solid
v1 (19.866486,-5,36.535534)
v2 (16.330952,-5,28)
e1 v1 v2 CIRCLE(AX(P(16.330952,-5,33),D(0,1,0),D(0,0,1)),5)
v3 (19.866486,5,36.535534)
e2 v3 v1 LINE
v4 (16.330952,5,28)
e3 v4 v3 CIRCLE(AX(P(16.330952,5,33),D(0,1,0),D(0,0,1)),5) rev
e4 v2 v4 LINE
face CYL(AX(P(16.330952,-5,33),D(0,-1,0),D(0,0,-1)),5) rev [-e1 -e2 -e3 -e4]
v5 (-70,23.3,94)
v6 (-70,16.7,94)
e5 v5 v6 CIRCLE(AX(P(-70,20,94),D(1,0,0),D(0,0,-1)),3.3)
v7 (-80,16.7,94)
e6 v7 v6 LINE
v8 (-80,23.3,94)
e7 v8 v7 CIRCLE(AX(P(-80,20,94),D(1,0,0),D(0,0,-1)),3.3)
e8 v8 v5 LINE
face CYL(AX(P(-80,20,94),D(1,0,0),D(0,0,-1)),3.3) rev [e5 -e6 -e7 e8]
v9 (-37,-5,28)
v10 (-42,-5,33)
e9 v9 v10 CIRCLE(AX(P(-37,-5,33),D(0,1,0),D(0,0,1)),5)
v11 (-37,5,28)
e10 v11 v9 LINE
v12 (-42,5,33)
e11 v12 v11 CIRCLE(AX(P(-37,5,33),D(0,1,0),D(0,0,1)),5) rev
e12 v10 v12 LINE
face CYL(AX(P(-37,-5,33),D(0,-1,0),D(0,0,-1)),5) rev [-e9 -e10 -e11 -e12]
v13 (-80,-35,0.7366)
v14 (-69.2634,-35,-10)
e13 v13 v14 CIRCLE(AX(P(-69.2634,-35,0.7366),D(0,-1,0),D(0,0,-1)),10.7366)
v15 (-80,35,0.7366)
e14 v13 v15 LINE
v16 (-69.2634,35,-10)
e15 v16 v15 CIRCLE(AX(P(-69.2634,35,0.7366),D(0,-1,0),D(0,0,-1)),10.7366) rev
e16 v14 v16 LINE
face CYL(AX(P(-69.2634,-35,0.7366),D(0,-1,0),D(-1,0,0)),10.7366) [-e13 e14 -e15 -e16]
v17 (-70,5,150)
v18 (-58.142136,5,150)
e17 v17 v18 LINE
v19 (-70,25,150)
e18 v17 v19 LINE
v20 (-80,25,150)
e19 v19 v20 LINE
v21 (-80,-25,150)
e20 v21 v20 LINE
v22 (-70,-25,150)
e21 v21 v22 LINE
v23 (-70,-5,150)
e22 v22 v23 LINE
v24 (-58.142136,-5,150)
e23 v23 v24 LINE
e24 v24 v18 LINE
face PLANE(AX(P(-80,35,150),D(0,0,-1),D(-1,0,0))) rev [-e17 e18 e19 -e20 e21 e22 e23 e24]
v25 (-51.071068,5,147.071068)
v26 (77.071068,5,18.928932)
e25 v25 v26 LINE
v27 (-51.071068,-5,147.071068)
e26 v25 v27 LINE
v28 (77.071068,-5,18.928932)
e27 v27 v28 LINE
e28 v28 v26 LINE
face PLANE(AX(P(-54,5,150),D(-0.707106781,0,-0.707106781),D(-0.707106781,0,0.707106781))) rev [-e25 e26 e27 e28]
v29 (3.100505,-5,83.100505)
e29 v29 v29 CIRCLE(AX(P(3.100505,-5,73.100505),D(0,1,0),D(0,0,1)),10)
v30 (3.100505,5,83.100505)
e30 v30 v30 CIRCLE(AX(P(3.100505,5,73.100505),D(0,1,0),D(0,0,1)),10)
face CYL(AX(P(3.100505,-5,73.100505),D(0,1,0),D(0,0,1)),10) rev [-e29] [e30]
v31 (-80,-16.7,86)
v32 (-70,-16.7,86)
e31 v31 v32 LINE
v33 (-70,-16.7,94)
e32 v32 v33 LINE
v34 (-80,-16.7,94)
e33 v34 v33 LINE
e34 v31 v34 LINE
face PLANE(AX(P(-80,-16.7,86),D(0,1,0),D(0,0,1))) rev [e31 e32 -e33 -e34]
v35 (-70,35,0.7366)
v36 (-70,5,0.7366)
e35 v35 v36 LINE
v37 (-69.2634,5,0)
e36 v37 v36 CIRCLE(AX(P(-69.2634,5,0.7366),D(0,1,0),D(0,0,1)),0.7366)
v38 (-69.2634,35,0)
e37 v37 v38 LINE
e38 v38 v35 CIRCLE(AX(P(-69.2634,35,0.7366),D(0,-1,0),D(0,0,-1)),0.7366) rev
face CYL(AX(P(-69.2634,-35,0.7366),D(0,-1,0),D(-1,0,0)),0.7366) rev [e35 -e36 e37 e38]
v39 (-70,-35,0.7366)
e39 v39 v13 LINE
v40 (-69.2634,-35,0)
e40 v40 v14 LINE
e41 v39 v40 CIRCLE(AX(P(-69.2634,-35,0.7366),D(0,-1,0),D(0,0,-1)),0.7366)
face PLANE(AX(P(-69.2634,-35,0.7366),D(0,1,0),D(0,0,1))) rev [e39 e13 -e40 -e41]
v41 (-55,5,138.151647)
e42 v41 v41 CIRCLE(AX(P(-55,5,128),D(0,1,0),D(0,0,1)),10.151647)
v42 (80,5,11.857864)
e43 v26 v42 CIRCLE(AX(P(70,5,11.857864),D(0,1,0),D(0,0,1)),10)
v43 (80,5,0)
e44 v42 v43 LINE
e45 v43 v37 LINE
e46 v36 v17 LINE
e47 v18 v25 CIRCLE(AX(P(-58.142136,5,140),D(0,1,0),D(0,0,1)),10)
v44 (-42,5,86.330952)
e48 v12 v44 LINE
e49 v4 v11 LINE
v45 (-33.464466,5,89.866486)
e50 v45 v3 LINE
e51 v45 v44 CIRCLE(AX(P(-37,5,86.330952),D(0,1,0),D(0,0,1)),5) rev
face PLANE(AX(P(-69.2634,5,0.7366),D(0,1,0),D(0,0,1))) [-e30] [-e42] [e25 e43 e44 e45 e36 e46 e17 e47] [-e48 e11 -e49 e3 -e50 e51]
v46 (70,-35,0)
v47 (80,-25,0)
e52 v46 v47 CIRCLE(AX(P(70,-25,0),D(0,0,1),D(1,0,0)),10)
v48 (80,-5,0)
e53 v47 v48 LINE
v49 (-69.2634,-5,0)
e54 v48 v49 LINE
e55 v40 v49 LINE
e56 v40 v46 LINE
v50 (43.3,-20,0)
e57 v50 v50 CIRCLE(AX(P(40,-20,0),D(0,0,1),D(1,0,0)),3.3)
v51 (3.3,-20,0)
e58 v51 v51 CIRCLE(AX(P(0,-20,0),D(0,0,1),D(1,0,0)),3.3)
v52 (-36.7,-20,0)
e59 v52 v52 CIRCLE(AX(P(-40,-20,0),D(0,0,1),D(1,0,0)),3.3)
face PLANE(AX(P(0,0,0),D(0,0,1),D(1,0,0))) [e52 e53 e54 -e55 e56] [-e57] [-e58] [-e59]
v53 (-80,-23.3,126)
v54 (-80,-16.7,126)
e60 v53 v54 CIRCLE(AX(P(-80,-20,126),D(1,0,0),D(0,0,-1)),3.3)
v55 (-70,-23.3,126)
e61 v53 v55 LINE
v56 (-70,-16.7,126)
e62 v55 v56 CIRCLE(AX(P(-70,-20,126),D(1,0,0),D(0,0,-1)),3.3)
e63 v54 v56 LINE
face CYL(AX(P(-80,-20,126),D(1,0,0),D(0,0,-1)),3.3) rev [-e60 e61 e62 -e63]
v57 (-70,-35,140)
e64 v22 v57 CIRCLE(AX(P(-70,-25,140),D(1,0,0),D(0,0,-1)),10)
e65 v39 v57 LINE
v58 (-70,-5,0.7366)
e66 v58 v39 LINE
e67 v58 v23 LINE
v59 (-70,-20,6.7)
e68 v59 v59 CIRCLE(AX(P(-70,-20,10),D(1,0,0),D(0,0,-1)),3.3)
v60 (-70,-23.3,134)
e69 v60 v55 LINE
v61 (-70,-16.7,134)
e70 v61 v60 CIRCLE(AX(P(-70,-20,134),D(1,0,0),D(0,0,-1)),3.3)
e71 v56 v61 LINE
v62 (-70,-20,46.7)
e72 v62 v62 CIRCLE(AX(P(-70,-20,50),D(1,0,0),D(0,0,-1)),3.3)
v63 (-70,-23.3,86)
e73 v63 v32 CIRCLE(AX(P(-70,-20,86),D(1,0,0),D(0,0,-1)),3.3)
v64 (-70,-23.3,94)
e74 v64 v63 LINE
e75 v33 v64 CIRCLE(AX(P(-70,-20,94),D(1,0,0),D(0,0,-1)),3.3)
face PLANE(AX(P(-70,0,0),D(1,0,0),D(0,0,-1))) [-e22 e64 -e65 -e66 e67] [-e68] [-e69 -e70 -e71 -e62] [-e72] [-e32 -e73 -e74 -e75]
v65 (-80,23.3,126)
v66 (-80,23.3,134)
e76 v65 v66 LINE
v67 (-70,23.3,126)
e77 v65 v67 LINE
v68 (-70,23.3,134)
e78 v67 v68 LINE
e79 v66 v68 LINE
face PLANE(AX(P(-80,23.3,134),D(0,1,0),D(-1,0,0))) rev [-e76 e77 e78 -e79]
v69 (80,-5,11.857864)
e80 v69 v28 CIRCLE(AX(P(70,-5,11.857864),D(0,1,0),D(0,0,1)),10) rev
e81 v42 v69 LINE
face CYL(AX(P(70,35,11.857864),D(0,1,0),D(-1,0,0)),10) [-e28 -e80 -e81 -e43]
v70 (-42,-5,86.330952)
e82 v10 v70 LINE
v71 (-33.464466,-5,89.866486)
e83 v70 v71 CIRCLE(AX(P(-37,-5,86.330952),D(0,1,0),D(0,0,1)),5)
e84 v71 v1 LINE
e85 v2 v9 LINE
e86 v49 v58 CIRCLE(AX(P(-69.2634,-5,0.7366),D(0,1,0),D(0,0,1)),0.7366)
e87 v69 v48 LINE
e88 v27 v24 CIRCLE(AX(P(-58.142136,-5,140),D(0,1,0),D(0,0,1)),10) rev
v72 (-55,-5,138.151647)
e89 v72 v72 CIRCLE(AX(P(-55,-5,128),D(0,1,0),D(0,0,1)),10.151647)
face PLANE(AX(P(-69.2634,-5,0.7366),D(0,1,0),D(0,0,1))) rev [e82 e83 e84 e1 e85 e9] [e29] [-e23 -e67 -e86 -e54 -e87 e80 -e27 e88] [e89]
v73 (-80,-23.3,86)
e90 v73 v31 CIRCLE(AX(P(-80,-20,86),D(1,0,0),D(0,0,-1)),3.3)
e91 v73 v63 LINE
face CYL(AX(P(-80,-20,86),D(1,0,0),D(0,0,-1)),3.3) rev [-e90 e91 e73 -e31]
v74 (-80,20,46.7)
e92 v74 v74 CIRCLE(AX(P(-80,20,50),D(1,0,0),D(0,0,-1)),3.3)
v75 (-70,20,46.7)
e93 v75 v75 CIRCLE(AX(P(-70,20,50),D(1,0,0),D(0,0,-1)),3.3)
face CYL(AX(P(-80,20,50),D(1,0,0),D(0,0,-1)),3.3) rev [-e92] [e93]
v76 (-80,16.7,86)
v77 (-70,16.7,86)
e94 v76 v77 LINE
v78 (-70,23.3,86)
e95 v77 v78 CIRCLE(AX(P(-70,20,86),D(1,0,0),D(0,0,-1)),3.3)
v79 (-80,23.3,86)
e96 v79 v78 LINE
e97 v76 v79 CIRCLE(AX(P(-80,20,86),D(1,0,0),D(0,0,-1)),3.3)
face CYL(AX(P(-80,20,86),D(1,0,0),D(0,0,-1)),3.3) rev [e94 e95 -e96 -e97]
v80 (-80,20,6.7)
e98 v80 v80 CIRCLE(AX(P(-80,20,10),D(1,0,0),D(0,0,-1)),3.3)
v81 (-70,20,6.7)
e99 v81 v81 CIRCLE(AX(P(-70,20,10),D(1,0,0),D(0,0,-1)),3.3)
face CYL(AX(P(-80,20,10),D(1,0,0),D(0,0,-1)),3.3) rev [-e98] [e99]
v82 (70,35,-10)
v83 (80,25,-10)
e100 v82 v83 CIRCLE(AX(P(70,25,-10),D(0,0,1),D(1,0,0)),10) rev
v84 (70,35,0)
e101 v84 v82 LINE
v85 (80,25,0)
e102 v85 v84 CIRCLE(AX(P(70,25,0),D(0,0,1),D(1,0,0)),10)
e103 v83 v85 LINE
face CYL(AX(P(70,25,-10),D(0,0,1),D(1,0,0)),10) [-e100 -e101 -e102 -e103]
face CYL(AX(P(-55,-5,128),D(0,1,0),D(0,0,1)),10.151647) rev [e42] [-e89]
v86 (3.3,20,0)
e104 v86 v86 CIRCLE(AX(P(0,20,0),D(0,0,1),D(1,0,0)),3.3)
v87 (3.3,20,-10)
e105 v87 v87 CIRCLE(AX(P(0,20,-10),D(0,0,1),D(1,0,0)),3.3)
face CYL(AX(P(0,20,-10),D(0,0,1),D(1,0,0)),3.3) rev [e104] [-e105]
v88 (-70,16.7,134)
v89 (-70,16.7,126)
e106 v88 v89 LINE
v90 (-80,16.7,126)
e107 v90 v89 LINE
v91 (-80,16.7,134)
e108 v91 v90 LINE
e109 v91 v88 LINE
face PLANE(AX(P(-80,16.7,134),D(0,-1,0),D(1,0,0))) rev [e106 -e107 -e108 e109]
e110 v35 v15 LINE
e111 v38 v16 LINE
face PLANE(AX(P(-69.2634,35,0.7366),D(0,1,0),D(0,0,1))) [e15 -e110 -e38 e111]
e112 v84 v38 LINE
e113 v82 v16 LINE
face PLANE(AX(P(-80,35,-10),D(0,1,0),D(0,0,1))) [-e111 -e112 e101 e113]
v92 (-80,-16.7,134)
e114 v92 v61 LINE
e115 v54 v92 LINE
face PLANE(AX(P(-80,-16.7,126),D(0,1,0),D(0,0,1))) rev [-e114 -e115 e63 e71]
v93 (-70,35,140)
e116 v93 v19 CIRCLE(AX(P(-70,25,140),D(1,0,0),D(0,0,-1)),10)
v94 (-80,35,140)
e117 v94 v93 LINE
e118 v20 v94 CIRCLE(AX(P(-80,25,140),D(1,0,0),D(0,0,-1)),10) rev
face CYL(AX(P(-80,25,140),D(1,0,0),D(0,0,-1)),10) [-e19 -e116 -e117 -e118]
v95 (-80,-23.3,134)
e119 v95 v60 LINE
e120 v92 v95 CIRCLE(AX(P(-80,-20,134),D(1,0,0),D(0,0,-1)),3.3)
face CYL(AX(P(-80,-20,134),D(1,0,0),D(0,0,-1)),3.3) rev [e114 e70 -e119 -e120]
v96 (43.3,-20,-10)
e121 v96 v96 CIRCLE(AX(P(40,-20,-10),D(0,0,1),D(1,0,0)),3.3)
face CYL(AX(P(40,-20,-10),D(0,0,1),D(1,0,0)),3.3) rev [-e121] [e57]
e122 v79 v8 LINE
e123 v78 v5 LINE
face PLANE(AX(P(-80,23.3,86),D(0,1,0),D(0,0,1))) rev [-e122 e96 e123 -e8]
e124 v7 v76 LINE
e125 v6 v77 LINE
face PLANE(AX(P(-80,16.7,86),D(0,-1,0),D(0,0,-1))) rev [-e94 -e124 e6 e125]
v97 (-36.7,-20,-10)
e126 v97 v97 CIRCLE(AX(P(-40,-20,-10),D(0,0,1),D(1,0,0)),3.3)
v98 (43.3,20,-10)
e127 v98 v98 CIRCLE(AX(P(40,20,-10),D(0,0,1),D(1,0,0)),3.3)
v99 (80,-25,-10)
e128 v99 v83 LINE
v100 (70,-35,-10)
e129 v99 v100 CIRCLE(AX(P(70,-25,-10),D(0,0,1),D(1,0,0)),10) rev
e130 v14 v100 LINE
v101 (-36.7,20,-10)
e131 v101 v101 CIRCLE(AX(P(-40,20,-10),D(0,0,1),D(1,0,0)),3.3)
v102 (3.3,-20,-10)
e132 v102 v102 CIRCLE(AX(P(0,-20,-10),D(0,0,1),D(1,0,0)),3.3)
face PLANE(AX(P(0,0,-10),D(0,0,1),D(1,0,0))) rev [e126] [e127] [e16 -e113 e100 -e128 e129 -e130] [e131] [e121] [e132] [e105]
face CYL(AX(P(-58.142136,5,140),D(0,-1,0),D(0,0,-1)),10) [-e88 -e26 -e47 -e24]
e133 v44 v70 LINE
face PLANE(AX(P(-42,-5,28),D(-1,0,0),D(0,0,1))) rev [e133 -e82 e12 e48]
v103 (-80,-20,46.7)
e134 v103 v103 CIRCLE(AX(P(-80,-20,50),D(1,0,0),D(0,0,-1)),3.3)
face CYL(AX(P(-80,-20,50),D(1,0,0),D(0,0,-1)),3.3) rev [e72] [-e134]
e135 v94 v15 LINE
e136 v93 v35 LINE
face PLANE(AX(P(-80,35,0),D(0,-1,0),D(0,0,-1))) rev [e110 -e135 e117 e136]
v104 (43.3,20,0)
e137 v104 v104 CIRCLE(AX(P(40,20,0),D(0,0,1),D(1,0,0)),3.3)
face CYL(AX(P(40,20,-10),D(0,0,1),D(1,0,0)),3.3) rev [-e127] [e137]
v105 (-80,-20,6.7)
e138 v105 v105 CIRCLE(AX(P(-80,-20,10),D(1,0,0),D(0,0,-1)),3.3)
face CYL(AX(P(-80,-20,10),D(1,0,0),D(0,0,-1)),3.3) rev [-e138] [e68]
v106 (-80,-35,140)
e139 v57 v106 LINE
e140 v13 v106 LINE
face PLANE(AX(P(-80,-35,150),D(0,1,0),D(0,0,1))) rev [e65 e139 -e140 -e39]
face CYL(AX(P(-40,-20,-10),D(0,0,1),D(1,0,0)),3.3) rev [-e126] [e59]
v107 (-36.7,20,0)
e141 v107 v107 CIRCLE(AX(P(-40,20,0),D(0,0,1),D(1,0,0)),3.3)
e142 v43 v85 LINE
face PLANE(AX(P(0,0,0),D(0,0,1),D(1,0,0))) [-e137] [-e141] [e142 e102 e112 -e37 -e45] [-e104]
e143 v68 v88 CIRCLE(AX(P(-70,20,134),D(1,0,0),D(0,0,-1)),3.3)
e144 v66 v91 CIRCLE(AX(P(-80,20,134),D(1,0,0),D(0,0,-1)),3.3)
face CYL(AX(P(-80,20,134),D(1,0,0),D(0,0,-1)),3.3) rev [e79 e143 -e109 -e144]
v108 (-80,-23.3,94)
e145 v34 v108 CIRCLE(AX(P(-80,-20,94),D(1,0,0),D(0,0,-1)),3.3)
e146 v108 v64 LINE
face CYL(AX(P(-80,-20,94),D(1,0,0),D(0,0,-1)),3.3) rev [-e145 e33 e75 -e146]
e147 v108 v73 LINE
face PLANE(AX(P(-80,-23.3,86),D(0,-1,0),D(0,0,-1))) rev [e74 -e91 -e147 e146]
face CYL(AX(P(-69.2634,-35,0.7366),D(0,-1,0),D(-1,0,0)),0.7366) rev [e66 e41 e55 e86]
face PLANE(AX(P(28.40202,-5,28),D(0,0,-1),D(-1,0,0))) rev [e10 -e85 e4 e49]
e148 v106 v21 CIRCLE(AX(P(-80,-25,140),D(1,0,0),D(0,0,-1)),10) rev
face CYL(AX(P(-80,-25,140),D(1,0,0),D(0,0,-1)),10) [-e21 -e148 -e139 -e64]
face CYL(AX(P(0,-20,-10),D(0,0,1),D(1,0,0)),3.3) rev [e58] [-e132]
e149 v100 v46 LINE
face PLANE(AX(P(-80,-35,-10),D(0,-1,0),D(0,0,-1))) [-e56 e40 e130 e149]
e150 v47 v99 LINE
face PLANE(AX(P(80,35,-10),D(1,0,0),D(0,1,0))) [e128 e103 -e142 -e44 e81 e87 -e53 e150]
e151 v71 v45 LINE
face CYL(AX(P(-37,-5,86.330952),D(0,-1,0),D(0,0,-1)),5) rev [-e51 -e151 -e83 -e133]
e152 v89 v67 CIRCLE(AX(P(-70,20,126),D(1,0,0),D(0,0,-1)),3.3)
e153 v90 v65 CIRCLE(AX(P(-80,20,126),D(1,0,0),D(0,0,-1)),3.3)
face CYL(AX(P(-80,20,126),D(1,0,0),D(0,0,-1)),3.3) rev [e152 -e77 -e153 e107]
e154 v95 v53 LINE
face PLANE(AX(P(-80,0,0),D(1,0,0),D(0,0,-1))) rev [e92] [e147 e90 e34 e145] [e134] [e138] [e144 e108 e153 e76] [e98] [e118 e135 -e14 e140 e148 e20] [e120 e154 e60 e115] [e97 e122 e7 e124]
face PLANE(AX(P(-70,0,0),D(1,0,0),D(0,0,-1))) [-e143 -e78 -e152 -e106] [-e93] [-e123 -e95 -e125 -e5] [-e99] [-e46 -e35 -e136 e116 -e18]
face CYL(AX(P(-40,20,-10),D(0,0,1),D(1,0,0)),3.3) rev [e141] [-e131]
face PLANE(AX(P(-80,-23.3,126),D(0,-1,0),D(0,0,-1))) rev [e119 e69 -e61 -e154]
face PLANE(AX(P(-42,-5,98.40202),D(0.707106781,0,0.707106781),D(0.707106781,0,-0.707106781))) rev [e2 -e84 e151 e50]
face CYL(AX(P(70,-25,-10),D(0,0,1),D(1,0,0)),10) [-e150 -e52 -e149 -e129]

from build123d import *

# Parameters (mm, degrees)
SKETCH_1_W                       = 160
SKETCH_1_H                       = 70
SM_BASE_FLANGE_1_DEPTH           = 10
SM_EDGE_FLANGE_1_STRIP_W         = 41.4732
SM_EDGE_FLANGE_1_STRIP_H         = 10
SM_EDGE_FLANGE_1_STRIP_CUT_DEPTH = 70
SM_EDGE_FLANGE_1_DEPTH           = 70
EXTRUDE_1_DEPTH                  = 5
FILLET_1_R                       = 10
CUT_EXTRUDE_1_DEPTH              = 10
FILLET_2_R                       = 5
SKETCH_11_R                      = 3.3
CUT_EXTRUDE_2_DEPTH              = 10
SKETCH_12_R                      = 3.3
CUT_EXTRUDE_3_DEPTH              = 10
SKETCH_13_R                      = 10
SKETCH_13_R_2                    = 10.151646836
CUT_EXTRUDE_4_DEPTH              = 10


# Sheet-metal steps are written as plain solids
with BuildPart() as part:
    # Sketch 1 → 基体-法兰1 (new body)
    with BuildSketch(Plane.XY):
        Rectangle(SKETCH_1_W, SKETCH_1_H)
    extrude(amount=-SM_BASE_FLANGE_1_DEPTH)

    # 边线-法兰1 strip (across the edge) → 边线-法兰1 strip cut (cut)
    with BuildSketch(Plane(origin=(-80, 35, 0), x_dir=(1, 0, 0), z_dir=(0, -1, 0))):
        with Locations((-10, -5)):
            Rectangle(SM_EDGE_FLANGE_1_STRIP_W, SM_EDGE_FLANGE_1_STRIP_H)
    extrude(amount=SM_EDGE_FLANGE_1_STRIP_CUT_DEPTH, mode=Mode.SUBTRACT)

    # 边线-法兰1 section (across the edge) → 边线-法兰1 (add)
    with BuildSketch(Plane(origin=(-80, 35, 0), x_dir=(1, 0, 0), z_dir=(0, -1, 0))):
        with BuildLine():
            Line((0, 0.7366), (0, 150))
            Line((0, 150), (10, 150))
            Line((10, 150), (10, 0.7366))
            ThreePointArc((10, 0.7366), (10.215745145, 0.215745145), (10.7366, 0))
            Line((10.7366, 0), (10.7366, -10))
            ThreePointArc((10.7366, -10), (3.144677333, -6.855322667), (0, 0.7366))
        make_face()
    extrude(amount=SM_EDGE_FLANGE_1_DEPTH)

    # 草图9 → 凸台-拉伸1 (add, symmetric)
    with BuildSketch(Plane(origin=(0, 0, 0), x_dir=(1, 0, 0), z_dir=(0, 1, 0))):
        with BuildLine():
            Line((-70, -150), (-54, -150))
            Line((-54, -150), (80, -16))
            Line((80, -16), (80, 0))
            Line((80, 0), (-69.2634, 0))
            ThreePointArc((-69.2634, 0), (-69.784254855, -0.215745145), (-70, -0.7366))
            Line((-70, -0.7366), (-70, -150))
        make_face()
    extrude(amount=EXTRUDE_1_DEPTH, both=True)

    # 圆角1
    fillet_1_edges = [part.edges().sort_by_distance(p)[0] for p in [
        (-75, 35, 150),
        (-75, -35, 150),
        (-54, 0, 150),
        (80, 0, 16),
        (80, -35, -5),
        (80, 35, -5),
    ]]
    fillet(fillet_1_edges, radius=FILLET_1_R)

    # 草图10 → 切除-拉伸1 (cut)
    with BuildSketch(Plane(origin=(0, 5, 0), x_dir=(1, 0, 0), z_dir=(0, 1, 0))):
        Polygon((-42, -98.402020254), (28.402020254, -28), (-42, -28), align=None)
    extrude(amount=-CUT_EXTRUDE_1_DEPTH, mode=Mode.SUBTRACT)

    # 圆角2
    fillet_2_edges = [part.edges().sort_by_distance(p)[0] for p in [
        (-42, 0, 98.402020254),
        (-42, 0, 28),
        (28.402020254, 0, 28),
    ]]
    fillet(fillet_2_edges, radius=FILLET_2_R)

    # 草图11 → 切除-拉伸2 (cut)
    with BuildSketch(Plane(origin=(-70, 0, 0), x_dir=(0, 0, -1), z_dir=(1, 0, 0))):
        with Locations((-50, 20)):
            Circle(SKETCH_11_R)
        with Locations((-10, 20)):
            Circle(SKETCH_11_R)
        with Locations((-10, -20)):
            Circle(SKETCH_11_R)
        with Locations((-50, -20)):
            Circle(SKETCH_11_R)
        with BuildLine():
            Line((-134, 23.3), (-126, 23.3))
            ThreePointArc((-126, 23.3), (-122.7, 20), (-126, 16.7))
            Line((-126, 16.7), (-134, 16.7))
            ThreePointArc((-134, 16.7), (-137.3, 20), (-134, 23.3))
        make_face()
        with BuildLine():
            Line((-86, 16.7), (-94, 16.7))
            ThreePointArc((-94, 16.7), (-97.3, 20), (-94, 23.3))
            Line((-94, 23.3), (-86, 23.3))
            ThreePointArc((-86, 23.3), (-82.7, 20), (-86, 16.7))
        make_face()
        with BuildLine():
            Line((-86, -23.3), (-94, -23.3))
            ThreePointArc((-94, -23.3), (-97.3, -20), (-94, -16.7))
            Line((-94, -16.7), (-86, -16.7))
            ThreePointArc((-86, -16.7), (-82.7, -20), (-86, -23.3))
        make_face()
        with BuildLine():
            Line((-126, -23.3), (-134, -23.3))
            ThreePointArc((-134, -23.3), (-137.3, -20), (-134, -16.7))
            Line((-134, -16.7), (-126, -16.7))
            ThreePointArc((-126, -16.7), (-122.7, -20), (-126, -23.3))
        make_face()
    extrude(amount=-CUT_EXTRUDE_2_DEPTH, mode=Mode.SUBTRACT)

    # 草图12 → 切除-拉伸3 (cut)
    with BuildSketch(Plane.XY):
        with Locations((-40, -20)):
            Circle(SKETCH_12_R)
        with Locations((-40, 20)):
            Circle(SKETCH_12_R)
        with Locations((40, 20)):
            Circle(SKETCH_12_R)
        with Locations((40, -20)):
            Circle(SKETCH_12_R)
        with Locations((0, -20)):
            Circle(SKETCH_12_R)
        with Locations((0, 20)):
            Circle(SKETCH_12_R)
    extrude(amount=-CUT_EXTRUDE_3_DEPTH, mode=Mode.SUBTRACT)

    # 草图13 → 切除-拉伸4 (cut)
    with BuildSketch(Plane(origin=(0, 5, 0), x_dir=(1, 0, 0), z_dir=(0, 1, 0))):
        with Locations(Location((3.100505063, -73.100505063, 0), (0, 0, 270))):
            Circle(SKETCH_13_R)
        with Locations(Location((-55, -128, 0), (0, 0, 270))):
            Circle(SKETCH_13_R_2)
    extrude(amount=-CUT_EXTRUDE_4_DEPTH, mode=Mode.SUBTRACT)


solid = part.part
